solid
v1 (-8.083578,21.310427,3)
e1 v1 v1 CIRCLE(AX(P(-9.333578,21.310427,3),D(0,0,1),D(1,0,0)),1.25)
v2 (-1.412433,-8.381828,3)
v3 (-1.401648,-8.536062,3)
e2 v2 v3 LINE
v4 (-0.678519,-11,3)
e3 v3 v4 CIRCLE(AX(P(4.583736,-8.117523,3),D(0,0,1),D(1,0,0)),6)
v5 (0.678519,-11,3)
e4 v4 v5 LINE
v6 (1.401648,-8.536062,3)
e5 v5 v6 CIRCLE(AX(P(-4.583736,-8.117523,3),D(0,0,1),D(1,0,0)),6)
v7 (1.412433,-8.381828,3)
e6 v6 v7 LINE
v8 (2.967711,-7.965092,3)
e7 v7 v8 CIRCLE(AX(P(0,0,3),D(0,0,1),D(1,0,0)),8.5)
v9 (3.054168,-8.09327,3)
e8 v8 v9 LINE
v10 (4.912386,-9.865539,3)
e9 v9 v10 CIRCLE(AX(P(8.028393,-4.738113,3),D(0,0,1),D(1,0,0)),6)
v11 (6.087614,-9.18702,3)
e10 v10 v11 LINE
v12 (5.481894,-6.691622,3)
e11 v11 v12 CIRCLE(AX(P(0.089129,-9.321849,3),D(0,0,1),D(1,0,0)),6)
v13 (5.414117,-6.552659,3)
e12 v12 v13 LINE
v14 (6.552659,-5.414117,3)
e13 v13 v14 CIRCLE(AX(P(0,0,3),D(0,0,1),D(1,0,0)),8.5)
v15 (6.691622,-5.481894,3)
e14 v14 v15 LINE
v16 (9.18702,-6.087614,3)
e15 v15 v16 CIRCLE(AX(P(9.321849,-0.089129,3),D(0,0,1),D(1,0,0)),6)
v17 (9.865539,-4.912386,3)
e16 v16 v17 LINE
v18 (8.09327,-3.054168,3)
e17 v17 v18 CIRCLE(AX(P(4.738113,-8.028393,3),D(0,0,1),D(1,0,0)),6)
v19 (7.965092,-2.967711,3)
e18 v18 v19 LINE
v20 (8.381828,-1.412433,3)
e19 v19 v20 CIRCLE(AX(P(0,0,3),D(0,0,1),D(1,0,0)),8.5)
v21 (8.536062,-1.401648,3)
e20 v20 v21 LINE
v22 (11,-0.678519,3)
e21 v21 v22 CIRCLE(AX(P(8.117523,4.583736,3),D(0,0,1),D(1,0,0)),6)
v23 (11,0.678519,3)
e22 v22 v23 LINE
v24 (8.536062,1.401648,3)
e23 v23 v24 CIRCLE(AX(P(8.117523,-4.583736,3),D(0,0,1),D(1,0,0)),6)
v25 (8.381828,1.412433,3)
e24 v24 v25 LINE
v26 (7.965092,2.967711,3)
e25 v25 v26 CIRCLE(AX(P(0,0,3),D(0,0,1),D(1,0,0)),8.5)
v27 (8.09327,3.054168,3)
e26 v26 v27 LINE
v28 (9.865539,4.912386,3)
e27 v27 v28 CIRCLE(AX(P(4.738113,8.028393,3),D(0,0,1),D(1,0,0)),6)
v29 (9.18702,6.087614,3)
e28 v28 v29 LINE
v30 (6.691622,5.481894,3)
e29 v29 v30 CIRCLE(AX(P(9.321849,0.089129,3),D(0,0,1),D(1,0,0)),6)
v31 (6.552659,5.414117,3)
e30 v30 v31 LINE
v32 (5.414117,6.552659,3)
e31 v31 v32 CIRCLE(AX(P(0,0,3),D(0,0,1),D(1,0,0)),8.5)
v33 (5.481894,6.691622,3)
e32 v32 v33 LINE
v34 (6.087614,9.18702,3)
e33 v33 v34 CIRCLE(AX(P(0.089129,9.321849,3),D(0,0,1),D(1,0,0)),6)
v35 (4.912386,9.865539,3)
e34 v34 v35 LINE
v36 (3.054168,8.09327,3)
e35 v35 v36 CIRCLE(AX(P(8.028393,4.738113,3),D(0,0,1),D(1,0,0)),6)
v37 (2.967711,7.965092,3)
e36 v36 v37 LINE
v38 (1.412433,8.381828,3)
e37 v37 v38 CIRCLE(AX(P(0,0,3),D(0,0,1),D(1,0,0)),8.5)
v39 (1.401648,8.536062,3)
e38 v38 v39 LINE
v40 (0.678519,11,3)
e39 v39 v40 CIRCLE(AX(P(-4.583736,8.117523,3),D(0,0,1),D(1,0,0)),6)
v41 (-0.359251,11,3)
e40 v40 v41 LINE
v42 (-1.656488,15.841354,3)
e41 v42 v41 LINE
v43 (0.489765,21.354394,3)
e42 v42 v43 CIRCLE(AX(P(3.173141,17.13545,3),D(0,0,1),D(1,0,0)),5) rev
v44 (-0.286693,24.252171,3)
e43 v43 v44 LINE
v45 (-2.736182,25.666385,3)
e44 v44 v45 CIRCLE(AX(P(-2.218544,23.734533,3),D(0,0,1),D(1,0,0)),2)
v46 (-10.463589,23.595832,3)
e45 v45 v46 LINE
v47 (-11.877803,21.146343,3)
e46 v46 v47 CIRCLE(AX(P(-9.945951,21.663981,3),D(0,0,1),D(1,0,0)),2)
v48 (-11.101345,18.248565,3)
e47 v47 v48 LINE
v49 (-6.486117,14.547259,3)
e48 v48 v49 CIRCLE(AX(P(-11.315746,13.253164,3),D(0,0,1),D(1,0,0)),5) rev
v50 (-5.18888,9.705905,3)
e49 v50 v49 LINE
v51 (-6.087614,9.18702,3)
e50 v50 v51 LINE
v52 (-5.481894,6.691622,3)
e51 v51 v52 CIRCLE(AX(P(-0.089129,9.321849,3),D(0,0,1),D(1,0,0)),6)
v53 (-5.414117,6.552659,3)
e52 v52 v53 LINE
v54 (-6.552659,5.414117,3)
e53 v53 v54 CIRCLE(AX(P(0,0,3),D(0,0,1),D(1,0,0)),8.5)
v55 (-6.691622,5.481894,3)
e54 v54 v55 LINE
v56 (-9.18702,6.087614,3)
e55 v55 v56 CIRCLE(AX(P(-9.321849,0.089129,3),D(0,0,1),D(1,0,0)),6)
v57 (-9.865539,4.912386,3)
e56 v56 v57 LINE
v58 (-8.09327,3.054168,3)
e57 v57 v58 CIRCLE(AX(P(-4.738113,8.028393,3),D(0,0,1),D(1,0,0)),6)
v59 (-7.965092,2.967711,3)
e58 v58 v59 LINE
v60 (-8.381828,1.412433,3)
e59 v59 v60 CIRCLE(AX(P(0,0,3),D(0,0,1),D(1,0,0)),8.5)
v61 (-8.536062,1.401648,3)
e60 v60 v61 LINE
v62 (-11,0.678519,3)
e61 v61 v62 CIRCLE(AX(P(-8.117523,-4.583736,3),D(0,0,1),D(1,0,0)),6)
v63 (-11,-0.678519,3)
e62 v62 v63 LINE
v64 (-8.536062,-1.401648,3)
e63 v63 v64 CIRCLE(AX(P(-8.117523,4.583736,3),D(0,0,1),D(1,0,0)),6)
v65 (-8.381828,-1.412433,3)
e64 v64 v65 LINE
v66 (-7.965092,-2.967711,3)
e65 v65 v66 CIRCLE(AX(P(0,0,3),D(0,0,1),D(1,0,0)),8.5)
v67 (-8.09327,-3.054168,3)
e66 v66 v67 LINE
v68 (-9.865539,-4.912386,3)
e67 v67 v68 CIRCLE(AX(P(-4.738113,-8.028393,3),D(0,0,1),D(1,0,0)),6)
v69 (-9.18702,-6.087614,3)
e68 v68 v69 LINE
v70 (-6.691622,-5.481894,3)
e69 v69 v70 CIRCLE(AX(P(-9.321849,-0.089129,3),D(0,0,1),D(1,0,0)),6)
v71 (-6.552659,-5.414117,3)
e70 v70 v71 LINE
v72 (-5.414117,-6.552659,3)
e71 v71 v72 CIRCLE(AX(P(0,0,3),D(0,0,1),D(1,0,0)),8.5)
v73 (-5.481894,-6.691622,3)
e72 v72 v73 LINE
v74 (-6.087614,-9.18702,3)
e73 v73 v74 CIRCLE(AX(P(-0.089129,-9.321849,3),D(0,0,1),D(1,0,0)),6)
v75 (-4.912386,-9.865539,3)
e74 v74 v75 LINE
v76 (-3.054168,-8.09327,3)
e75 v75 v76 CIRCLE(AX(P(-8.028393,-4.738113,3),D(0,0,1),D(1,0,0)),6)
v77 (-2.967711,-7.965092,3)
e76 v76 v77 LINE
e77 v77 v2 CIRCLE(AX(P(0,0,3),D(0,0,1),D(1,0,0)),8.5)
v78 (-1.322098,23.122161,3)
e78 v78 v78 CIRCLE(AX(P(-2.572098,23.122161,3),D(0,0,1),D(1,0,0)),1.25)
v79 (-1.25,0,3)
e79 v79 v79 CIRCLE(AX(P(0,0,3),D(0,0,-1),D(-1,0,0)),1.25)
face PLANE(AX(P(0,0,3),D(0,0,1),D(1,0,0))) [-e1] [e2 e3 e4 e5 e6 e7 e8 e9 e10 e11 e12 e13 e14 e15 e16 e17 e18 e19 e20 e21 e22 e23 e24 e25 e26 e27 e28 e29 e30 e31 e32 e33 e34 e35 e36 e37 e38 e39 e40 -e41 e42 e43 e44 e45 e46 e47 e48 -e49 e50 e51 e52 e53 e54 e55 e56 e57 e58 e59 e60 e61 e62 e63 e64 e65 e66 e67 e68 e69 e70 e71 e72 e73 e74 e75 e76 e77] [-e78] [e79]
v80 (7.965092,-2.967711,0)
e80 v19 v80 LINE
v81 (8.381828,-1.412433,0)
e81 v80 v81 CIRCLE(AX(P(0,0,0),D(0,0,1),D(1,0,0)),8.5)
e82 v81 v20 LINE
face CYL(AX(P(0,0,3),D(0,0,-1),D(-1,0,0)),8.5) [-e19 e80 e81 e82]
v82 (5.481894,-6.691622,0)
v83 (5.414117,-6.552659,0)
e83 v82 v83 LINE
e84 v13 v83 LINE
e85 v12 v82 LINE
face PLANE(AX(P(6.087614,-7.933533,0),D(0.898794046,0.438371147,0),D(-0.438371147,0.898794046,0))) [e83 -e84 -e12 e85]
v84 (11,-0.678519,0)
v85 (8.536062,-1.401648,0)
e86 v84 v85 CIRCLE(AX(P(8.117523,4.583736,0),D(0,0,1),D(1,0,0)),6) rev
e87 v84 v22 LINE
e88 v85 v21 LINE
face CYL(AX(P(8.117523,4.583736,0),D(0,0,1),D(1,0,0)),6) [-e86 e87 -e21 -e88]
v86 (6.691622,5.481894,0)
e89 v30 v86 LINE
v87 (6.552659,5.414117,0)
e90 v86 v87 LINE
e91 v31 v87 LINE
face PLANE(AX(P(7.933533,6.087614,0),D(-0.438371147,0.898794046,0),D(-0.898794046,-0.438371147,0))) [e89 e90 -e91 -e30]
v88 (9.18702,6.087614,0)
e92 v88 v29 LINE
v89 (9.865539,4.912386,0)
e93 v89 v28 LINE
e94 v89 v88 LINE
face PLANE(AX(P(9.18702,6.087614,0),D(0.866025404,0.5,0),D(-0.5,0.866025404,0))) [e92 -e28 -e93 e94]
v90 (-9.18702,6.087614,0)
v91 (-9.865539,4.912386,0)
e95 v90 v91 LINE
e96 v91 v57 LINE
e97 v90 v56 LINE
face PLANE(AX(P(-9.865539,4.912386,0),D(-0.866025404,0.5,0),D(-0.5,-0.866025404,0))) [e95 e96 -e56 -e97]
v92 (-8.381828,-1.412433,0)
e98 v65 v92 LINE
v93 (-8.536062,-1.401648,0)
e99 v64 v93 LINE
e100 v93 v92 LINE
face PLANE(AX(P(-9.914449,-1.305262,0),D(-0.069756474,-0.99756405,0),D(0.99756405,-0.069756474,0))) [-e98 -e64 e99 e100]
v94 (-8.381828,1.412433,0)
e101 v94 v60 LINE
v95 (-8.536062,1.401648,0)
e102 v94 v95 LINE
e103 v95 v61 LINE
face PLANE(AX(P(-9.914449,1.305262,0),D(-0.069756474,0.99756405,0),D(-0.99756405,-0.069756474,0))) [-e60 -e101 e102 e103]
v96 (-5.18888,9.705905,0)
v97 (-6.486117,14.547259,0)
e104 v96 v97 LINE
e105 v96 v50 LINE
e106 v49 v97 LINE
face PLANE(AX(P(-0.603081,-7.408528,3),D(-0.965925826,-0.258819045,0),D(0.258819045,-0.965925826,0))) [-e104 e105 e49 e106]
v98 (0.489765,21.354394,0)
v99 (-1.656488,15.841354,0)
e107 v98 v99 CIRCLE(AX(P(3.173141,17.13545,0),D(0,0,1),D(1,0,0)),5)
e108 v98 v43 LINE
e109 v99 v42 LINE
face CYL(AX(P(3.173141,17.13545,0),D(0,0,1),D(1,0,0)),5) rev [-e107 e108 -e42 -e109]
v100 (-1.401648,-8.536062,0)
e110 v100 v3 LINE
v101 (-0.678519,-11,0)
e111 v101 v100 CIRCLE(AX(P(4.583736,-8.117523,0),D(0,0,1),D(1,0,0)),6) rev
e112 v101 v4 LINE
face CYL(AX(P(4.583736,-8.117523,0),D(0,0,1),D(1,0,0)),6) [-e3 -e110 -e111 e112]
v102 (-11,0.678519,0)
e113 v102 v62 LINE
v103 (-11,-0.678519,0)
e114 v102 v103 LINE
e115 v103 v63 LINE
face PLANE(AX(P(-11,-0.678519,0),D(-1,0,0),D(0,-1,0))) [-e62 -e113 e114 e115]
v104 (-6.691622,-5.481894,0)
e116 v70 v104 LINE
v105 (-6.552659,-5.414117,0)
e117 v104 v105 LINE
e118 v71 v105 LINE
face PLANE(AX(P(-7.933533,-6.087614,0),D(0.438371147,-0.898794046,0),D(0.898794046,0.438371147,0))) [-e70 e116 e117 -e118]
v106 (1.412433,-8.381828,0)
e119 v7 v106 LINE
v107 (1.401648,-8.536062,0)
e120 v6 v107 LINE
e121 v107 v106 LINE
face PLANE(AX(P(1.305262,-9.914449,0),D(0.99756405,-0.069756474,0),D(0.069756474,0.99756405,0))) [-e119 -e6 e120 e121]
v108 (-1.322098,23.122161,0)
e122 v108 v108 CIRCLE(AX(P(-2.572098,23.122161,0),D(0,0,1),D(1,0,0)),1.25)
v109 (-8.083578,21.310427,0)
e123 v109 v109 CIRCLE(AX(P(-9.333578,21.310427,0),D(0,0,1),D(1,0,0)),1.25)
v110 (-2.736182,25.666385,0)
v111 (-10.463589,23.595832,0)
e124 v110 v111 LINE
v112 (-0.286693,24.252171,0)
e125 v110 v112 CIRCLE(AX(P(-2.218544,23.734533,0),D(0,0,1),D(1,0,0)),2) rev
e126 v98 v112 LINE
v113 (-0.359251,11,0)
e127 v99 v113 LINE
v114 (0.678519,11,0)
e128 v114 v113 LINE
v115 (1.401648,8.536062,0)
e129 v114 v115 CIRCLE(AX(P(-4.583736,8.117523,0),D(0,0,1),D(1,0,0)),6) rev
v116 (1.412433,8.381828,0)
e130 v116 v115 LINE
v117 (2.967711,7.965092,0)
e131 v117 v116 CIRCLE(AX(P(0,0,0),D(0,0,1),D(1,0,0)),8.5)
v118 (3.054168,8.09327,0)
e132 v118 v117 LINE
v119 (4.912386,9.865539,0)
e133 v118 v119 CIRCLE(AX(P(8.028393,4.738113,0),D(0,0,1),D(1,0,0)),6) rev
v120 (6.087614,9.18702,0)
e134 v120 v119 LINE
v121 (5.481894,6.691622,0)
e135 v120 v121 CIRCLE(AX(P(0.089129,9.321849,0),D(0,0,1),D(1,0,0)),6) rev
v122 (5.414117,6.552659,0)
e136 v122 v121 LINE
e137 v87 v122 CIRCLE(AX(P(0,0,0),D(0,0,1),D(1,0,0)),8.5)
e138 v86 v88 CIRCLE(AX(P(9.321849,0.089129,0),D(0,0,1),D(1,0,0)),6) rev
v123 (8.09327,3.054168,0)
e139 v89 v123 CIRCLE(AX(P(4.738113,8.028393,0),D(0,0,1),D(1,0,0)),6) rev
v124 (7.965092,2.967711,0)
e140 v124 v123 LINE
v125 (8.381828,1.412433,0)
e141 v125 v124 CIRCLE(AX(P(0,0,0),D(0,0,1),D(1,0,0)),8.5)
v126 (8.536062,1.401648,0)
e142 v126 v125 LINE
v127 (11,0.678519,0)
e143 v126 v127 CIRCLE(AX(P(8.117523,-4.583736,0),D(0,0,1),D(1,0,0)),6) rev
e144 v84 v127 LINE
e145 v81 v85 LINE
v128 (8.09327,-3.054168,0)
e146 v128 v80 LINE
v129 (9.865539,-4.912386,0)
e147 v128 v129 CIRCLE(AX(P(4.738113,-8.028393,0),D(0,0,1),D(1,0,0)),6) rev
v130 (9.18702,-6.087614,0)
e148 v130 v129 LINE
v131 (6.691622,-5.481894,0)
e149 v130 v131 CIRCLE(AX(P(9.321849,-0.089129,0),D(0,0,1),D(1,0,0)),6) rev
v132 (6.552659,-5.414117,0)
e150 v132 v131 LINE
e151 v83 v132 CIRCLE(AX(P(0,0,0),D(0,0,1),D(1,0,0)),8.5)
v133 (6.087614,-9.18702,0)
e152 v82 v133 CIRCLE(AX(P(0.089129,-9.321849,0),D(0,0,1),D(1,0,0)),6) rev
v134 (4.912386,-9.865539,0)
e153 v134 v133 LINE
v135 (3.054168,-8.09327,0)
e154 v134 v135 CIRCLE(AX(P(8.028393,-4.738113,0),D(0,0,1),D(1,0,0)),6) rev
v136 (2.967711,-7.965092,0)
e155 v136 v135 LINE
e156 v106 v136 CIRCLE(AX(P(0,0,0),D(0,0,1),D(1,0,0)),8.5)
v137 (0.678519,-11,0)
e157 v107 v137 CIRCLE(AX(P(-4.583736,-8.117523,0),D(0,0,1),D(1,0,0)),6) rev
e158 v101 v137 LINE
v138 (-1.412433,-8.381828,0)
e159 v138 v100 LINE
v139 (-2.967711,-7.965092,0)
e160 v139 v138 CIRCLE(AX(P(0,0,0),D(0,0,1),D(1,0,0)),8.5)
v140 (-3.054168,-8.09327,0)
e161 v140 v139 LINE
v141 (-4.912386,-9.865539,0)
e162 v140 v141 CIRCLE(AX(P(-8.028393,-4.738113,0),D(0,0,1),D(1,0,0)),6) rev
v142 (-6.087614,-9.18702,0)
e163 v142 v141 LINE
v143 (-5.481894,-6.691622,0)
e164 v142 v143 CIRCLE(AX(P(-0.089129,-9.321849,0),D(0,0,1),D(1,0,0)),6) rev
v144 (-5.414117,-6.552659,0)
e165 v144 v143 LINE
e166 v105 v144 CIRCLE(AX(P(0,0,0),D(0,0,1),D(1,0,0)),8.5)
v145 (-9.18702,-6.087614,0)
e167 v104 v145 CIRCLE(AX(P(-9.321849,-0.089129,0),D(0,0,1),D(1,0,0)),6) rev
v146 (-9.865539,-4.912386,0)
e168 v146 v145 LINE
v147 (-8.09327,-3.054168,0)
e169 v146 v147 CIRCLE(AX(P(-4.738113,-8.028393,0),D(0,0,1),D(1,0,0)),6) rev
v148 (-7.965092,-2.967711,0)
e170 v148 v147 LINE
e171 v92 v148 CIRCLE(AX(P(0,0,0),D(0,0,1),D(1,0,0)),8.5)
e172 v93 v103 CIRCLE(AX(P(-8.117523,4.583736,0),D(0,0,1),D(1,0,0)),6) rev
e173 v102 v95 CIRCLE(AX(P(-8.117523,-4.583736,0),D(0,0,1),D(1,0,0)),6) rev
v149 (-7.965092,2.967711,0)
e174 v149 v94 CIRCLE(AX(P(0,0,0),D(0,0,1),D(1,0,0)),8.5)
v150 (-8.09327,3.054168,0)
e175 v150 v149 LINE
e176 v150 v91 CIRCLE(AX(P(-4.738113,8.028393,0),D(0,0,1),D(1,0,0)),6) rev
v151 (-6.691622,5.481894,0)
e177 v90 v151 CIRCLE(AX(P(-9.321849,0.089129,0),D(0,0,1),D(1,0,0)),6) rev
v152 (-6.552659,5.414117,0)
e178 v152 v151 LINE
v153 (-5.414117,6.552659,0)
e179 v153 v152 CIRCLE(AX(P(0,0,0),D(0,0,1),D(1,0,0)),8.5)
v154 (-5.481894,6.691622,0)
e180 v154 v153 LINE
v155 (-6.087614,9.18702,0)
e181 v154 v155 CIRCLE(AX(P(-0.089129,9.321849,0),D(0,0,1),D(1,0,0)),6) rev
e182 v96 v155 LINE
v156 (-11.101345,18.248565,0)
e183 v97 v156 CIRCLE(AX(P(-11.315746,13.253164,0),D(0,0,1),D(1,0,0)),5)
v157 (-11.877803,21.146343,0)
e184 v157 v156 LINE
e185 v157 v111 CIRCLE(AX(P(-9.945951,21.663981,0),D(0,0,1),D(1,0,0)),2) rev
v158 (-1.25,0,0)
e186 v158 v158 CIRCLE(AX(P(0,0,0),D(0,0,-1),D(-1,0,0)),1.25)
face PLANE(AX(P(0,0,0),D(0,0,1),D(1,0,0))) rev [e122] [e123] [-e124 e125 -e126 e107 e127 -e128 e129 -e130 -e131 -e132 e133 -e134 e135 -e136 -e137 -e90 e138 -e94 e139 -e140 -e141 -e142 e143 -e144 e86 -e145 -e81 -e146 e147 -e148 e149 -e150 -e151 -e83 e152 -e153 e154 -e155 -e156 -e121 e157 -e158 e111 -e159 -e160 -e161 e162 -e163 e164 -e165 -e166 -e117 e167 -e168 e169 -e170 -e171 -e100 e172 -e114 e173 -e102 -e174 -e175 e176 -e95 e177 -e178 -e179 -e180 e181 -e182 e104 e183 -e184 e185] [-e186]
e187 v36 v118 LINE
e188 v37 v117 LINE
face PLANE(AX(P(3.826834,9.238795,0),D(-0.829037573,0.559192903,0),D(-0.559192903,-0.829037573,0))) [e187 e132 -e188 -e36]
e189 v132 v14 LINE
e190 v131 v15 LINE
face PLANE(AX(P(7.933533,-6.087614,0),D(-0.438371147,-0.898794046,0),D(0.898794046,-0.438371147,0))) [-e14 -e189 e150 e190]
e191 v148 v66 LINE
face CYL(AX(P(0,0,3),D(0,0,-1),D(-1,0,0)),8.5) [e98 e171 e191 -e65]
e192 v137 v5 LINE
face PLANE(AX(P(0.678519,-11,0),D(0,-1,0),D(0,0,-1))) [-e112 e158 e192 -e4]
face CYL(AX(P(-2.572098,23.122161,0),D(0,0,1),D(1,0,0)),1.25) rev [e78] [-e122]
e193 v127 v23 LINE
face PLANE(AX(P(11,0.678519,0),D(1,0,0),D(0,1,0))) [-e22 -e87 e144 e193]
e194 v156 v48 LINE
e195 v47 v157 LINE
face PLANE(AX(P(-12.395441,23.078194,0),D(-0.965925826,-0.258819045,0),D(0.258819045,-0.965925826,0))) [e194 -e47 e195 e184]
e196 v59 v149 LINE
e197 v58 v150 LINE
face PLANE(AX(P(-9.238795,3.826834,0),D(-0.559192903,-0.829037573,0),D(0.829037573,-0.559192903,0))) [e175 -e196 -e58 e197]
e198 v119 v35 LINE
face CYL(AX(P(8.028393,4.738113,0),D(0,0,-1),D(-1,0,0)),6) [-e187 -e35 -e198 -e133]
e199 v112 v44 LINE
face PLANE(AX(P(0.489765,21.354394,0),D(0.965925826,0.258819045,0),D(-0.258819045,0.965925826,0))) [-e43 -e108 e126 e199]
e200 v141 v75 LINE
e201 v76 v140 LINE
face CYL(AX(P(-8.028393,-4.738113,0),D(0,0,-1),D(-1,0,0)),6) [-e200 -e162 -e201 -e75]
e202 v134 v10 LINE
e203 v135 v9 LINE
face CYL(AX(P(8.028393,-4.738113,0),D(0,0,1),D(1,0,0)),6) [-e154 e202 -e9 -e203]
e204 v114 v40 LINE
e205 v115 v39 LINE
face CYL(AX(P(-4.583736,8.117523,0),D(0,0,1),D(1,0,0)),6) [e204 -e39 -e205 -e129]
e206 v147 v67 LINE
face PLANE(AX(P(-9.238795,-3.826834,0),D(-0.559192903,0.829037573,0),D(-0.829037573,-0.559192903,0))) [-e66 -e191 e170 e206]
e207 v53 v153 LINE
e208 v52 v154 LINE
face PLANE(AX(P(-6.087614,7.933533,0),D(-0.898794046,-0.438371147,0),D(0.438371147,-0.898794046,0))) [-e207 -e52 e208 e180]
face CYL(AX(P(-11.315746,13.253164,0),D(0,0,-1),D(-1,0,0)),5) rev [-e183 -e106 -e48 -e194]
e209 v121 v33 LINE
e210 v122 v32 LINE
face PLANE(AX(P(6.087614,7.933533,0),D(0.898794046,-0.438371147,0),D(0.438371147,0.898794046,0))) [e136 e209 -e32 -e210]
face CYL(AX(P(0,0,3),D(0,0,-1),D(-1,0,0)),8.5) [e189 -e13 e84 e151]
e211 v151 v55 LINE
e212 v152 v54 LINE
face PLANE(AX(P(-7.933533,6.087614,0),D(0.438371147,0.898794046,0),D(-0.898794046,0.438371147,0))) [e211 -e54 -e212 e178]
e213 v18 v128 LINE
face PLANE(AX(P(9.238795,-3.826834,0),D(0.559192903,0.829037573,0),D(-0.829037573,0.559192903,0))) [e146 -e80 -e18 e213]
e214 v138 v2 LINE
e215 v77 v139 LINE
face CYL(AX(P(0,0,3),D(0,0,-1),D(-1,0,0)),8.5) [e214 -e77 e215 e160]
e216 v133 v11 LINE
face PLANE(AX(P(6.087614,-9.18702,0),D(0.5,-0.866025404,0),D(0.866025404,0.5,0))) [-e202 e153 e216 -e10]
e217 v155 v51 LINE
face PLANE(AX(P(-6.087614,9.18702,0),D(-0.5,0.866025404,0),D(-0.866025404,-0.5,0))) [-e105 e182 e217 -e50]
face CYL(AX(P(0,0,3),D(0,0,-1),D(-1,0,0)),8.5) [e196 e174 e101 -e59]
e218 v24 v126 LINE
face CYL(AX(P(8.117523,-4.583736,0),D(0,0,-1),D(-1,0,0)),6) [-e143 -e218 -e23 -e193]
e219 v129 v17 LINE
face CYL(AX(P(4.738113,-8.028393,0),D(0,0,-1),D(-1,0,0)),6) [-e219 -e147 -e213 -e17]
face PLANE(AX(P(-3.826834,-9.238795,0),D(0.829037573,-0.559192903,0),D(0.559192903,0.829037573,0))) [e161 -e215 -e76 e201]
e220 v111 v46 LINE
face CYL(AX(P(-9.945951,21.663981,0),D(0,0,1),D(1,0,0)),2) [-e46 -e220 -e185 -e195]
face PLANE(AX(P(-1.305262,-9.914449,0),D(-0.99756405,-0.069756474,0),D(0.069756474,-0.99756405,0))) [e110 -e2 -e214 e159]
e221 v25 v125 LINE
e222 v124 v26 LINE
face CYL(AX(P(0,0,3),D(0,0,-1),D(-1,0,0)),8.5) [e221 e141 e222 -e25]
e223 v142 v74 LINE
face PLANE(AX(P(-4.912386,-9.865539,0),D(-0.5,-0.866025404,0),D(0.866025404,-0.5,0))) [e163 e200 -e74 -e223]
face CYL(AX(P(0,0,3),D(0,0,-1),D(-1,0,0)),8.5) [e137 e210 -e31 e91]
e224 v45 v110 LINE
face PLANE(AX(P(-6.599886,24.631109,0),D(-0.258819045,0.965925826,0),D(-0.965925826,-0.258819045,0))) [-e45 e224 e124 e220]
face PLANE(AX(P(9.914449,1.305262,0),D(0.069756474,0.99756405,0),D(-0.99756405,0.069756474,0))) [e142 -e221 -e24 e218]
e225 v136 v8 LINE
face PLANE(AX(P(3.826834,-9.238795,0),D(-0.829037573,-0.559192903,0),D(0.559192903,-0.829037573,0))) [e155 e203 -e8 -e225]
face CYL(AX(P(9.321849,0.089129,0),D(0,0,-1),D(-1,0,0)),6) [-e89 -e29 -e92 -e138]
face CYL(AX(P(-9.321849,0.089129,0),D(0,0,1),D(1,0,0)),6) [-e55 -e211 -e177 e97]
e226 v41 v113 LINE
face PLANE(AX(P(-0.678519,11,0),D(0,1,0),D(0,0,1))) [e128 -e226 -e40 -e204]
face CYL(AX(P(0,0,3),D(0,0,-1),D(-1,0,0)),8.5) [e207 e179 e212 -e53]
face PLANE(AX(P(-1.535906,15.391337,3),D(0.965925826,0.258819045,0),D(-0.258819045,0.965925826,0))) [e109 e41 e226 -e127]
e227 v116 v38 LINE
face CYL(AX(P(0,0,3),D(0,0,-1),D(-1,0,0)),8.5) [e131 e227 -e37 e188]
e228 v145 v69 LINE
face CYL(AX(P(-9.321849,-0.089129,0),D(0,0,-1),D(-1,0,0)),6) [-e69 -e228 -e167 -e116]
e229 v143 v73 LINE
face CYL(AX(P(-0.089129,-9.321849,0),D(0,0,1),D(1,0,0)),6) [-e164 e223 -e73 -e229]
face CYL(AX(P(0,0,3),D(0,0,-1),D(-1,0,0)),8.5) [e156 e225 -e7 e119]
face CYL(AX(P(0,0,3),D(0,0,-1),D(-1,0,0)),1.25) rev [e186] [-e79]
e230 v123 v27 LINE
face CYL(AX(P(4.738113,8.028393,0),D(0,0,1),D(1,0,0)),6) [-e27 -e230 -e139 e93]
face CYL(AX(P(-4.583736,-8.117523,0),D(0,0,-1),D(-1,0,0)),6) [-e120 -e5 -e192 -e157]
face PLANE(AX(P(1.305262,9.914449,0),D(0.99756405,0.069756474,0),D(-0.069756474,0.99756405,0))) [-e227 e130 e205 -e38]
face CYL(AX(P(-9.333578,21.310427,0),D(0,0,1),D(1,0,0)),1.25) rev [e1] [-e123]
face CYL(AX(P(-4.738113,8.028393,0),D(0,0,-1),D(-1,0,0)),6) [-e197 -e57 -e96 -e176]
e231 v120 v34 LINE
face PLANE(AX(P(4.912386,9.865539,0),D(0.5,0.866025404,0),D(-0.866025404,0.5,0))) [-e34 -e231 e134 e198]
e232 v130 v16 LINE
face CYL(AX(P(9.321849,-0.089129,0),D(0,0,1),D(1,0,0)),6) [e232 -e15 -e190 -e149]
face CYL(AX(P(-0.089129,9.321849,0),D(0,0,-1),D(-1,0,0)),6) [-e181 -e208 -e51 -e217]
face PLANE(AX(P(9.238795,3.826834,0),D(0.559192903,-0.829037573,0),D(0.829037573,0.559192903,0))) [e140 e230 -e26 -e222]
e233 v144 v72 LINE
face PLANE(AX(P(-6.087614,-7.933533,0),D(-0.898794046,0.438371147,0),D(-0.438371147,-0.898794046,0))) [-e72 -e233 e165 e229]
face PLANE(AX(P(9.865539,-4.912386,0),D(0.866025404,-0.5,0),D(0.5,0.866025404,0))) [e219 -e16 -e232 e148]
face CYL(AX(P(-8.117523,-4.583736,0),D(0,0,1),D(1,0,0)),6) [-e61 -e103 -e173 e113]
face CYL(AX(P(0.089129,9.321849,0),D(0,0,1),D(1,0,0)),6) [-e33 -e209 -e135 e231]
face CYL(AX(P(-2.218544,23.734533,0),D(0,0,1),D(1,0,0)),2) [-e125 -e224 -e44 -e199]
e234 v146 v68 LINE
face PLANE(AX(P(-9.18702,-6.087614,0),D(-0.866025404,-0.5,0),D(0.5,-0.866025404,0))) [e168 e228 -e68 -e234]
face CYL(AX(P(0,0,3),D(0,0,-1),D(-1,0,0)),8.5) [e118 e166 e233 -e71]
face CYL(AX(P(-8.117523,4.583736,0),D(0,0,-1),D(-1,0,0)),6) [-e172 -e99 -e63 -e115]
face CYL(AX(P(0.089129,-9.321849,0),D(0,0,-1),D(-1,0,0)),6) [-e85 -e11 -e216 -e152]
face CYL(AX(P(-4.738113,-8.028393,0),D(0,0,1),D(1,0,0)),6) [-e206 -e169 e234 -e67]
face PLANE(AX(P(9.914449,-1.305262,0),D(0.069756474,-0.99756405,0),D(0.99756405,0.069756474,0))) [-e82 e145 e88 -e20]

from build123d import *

# Parameters (mm, degrees)
SKETCH1_R           = 8.5
BOSS_EXTRUDE1_DEPTH = 3
BOSS_EXTRUDE2_DEPTH = 3
CIRPATTERN2_COUNT   = 12
FILLET5_R           = 6
FILLET6_R           = 6
BOSS_EXTRUDE5_DEPTH = 3
SKETCH15_R          = 5
BOSS_EXTRUDE6_DEPTH = 1.9
SKETCH14_R          = 1.25
CUT_EXTRUDE7_DEPTH  = 28.730582035
SKETCH17_R          = 1.25
CUT_EXTRUDE9_DEPTH  = 28.730582035
FILLET7_R           = 2.5
BOSS_EXTRUDE7_DEPTH = 3
SKETCH20_R          = 1.25
CUT_EXTRUDE10_DEPTH = 3
FILLET8_R           = 5
FILLET9_R           = 5
FILLET10_R          = 2
FILLET11_R          = 2


# Some blends are built 0.0001 mm under size
with BuildPart() as part:
    # Sketch1 → Boss-Extrude1 (new body)
    with BuildSketch(Plane.XY):
        Circle(SKETCH1_R)
    extrude(amount=BOSS_EXTRUDE1_DEPTH)

    # Sketch3 → Boss-Extrude2 (add)
    with BuildSketch(Plane.XY.offset(3)):
        Polygon((-1.305261922, 9.914448614), (-1.509060022, 7), (1.509060022, 7), (1.305261922, 9.914448614), (0.678518537, 11), (-0.678518537, 11), align=None)
    boss_extrude2 = extrude(amount=-BOSS_EXTRUDE2_DEPTH)

    # CirPattern2: Boss-Extrude2 ×12 about axis
    cirpattern2_axis = Axis((0, 0, 0), (0, 0, 1))
    for i in range(1, CIRPATTERN2_COUNT):
        add(boss_extrude2.rotate(cirpattern2_axis, i * 360 / CIRPATTERN2_COUNT))

    # Fillet5
    # the kernel refuses this fillet: 6 mm, written as the material it takes off along each edge
    with BuildSketch(Plane(origin=(9.238795325, 3.826834324, 6.454382408), x_dir=(0.4999999999998129, 0.8660254037845467, 0), z_dir=(0, 0, -1)), Plane(origin=(1.305261922, 9.914448614, 6.454382408), x_dir=(-0.5000000000001841, 0.8660254037843323, 0), z_dir=(0, 0, -1)), Plane(origin=(-7.933533403, 6.08761429, 6.454382408), x_dir=(-1, 0, 0), z_dir=(0, 0, -1)), Plane(origin=(-9.914448614, 1.305261922, 6.454382408), x_dir=(-0.8660254037843317, -0.5000000000001852, 0), z_dir=(0, 0, -1)), Plane(origin=(-9.238795325, -3.826834324, 6.454382408), x_dir=(-0.49999999999981826, -0.8660254037845436, 0), z_dir=(0, 0, -1)), Plane(origin=(-6.08761429, -7.933533403, 6.454382408), x_dir=(0, -1, 0), z_dir=(0, 0, -1)), Plane(origin=(3.826834324, -9.238795325, 6.454382408), x_dir=(0.866025403784545, -0.49999999999981576, 0), z_dir=(0, 0, -1)), Plane(origin=(7.933533403, -6.08761429, 6.454382408), x_dir=(1, 0, 0), z_dir=(0, 0, -1)), Plane(origin=(9.914448614, -1.305261922, 6.454382408), x_dir=(0.8660254037843321, 0.5000000000001844, 0), z_dir=(0, 0, -1))) as fillet5_piece_1:
        with BuildLine():
            CenterArc((1.388315544, -5.998484909), FILLET5_R, 91.287628333, 24.712371667)
            Line((-1.241911337, -0.605720631), (-1.294515874, -0.497865346))
            Line((-1.294515874, -0.497865346), (-0.052604538, 0.107855286))
            Line((-0.052604538, 0.107855286), (0, 0.12))
            ThreePointArc((0, 0.12), (0.626743385, 0.12), (1.250790195, 0.119969698))
            Line((1.250790195, 0.119969698), (1.25348677, 0))
        make_face()
    extrude(amount=9.908764816, mode=Mode.SUBTRACT)
    with BuildSketch(Plane(origin=(6.08761429, 7.933533403, 6.454382408), x_dir=(-0.4383711467890806, -0.8987940462991654, 0), z_dir=(0, 0, -1)), Plane(origin=(-3.826834324, 9.238795325, 6.454382408), x_dir=(0.5591929034707435, -0.8290375725550441, 0), z_dir=(0, 0, -1)), Plane(origin=(-1.305261922, -9.914448614, 6.454382408), x_dir=(-0.06975647374412178, 0.9975640502598244, 0), z_dir=(0, 0, -1))) as fillet5_piece_2:
        with BuildLine():
            CenterArc((1.381752963, 6), FILLET5_R, 245.287628333, 24.712371667)
            Line((-1.126626446, 0.549492433), (-1.176794034, 0.440482282))
            ThreePointArc((-1.176794034, 0.440482282), (-0.615917761, 0.166890931), (-0.052604538, -0.107855286))
            Line((-0.052604538, -0.107855286), (0, -0.12))
            Line((0, -0.12), (1.381752963, -0.12))
            Line((1.381752963, -0.12), (1.381752963, 0))
        make_face()
    extrude(amount=9.908764816, mode=Mode.SUBTRACT)

    # Fillet6
    # the kernel refuses this fillet: 6 mm, written as the material it takes off along each edge
    with BuildSketch(Plane(origin=(7.933533403, 6.08761429, 6.454382408), x_dir=(-0.8987940462991681, -0.4383711467890748, 0), z_dir=(0, 0, -1)), Plane(origin=(3.826834324, 9.238795325, 6.454382408), x_dir=(-0.5591929034707512, -0.8290375725550386, 0), z_dir=(0, 0, -1)), Plane(origin=(-1.305261922, 9.914448614, 6.454382408), x_dir=(-0.06975647374412959, -0.9975640502598239, 0), z_dir=(0, 0, -1)), Plane(origin=(-6.08761429, 7.933533403, 6.454382408), x_dir=(0.43837114678907496, -0.8987940462991681, 0), z_dir=(0, 0, -1)), Plane(origin=(-9.238795325, 3.826834324, 6.454382408), x_dir=(0.8290375725550394, -0.5591929034707502, 0), z_dir=(0, 0, -1)), Plane(origin=(-9.914448614, -1.305261922, 6.454382408), x_dir=(0.9975640502598241, -0.06975647374412908, 0), z_dir=(0, 0, -1)), Plane(origin=(-7.933533403, -6.08761429, 6.454382408), x_dir=(0.8987940462991686, 0.4383711467890744, 0), z_dir=(0, 0, -1)), Plane(origin=(-3.826834324, -9.238795325, 6.454382408), x_dir=(0.559192903470749, 0.8290375725550401, 0), z_dir=(0, 0, -1)), Plane(origin=(1.305261922, -9.914448614, 6.454382408), x_dir=(0.06975647374412973, 0.9975640502598241, 0), z_dir=(0, 0, -1)), Plane(origin=(6.08761429, -7.933533403, 6.454382408), x_dir=(-0.4383711467890742, 0.8987940462991686, 0), z_dir=(0, 0, -1)), Plane(origin=(9.238795325, -3.826834324, 6.454382408), x_dir=(-0.8290375725550386, 0.5591929034707512, 0), z_dir=(0, 0, -1)), Plane(origin=(9.914448614, 1.305261922, 6.454382408), x_dir=(-0.9975640502598239, 0.06975647374412945, 0), z_dir=(0, 0, -1))) as fillet6_piece_1:
        with BuildLine():
            CenterArc((1.381752963, -6), FILLET6_R, 90, 24.712371667)
            Line((-1.126626446, -0.549492433), (-1.176794034, -0.440482282))
            ThreePointArc((-1.176794034, -0.440482282), (-0.615917761, -0.166890931), (-0.052604538, 0.107855286))
            Line((-0.052604538, 0.107855286), (0, 0.12))
            Line((0, 0.12), (1.381752963, 0.12))
            Line((1.381752963, 0.12), (1.381752963, 0))
        make_face()
    extrude(amount=9.908764816, mode=Mode.SUBTRACT)

    # Sketch12 → Boss-Extrude5 (add)
    with BuildSketch(Plane(origin=(0, 0, 0), x_dir=(-1, 0, 0), z_dir=(0, 0, -1))):
        Polygon((1.535905814, 15.391336798), (-4.226547881, -6.114433171), (0.60308125, -7.408528397), (9.014700216, 23.984060958), (4.185071084, 25.278156183), align=None)
    extrude(amount=-BOSS_EXTRUDE5_DEPTH)

    # Sketch15 → Boss-Extrude6 (add)
    with BuildSketch(Plane(origin=(0, 0, 0), x_dir=(-1, 0, 0), z_dir=(0, 0, -1))):
        Circle(SKETCH15_R)
    extrude(amount=-BOSS_EXTRUDE6_DEPTH)

    # Sketch14 → Cut-Extrude7 (cut, through all)
    with BuildSketch(Plane(origin=(0, 0, 0), x_dir=(-1, 0, 0), z_dir=(0, 0, -1))):
        Circle(SKETCH14_R)
    extrude(amount=-CUT_EXTRUDE7_DEPTH, mode=Mode.SUBTRACT)

    # Sketch17 → Cut-Extrude9 (cut, through all)
    with BuildSketch(Plane.XY.offset(3)):
        with Locations((-5.952838037, 22.216294005)):
            Circle(SKETCH17_R)
    extrude(amount=-CUT_EXTRUDE9_DEPTH, mode=Mode.SUBTRACT)

    # Fillet7
    fillet7_edges = [part.edges().sort_by_distance(p)[0] for p in [
        (-9.014700216, 23.984060958, 1.5),
        (-4.185071084, 25.278156183, 1.5),
    ]]
    fillet(fillet7_edges, radius=FILLET7_R - 0.0001)  # a hair under: the kernel refuses the full size

    # Sketch19 → Boss-Extrude7 (add)
    with BuildSketch(Plane.XY.offset(3)):
        Polygon((-6.59988565, 24.63110857), (-12.395440608, 23.0781943), (-11.101345382, 18.248565168), (0.489764533, 21.35439371), (-0.804330692, 26.184022841), align=None)
    extrude(amount=-BOSS_EXTRUDE7_DEPTH)

    # Sketch20 → Cut-Extrude10 (cut)
    with BuildSketch(Plane.XY.offset(3)):
        with Locations((-9.333578429, 21.310427347)):
            Circle(SKETCH20_R)
        with Locations((-2.572097645, 23.122160663)):
            Circle(SKETCH20_R)
    extrude(amount=-CUT_EXTRUDE10_DEPTH, mode=Mode.SUBTRACT)

    # Fillet8
    # the kernel refuses this fillet: 5 mm, written as the material it adds along each edge
    with BuildSketch(Plane(origin=(-7.72060499, 19.154431826, 0), x_dir=(-0.9659258262890523, -0.25881904510258064, 0), z_dir=(0, 0, 1))) as fillet8_piece_1:
        with BuildLine():
            CenterArc((5, 4.769696007), FILLET8_R, 180, 72.542396876)
            Line((0, 4.769696007), (-0.1, 4.769696007))
            Line((-0.1, 4.769696007), (-0.1, 0))
            Line((-0.1, 0), (0, -0.1))
            ThreePointArc((0, -0.1), (1.75, -0.1), (3.47, -0.09539392))
            Line((3.47, -0.09539392), (3.5, 0))
        make_face()
    extrude(amount=3)

    # Fillet9
    # the kernel refuses this fillet: 5 mm, written as the material it adds along each edge
    with BuildSketch(Plane(origin=(-2.890975859, 20.448527052, 3), x_dir=(0.9659258262890524, 0.25881904510257997, 0), z_dir=(0, 0, -1))) as fillet9_piece_1:
        with BuildLine():
            CenterArc((5, 4.769696007), FILLET9_R, 180, 72.542396876)
            Line((0, 4.769696007), (-0.1, 4.769696007))
            Line((-0.1, 4.769696007), (-0.1, 0))
            Line((-0.1, 0), (0, -0.1))
            ThreePointArc((0, -0.1), (1.75, -0.1), (3.47, -0.09539392))
            Line((3.47, -0.09539392), (3.5, 0))
        make_face()
    extrude(amount=3)

    # Fillet10
    fillet10_edges = [part.edges().sort_by_distance(p)[0] for p in [
        (-0.804330692, 26.184022841, 1.5),
    ]]
    fillet(fillet10_edges, radius=FILLET10_R)

    # Fillet11
    fillet11_edges = [part.edges().sort_by_distance(p)[0] for p in [
        (-12.395440608, 23.0781943, 1.5),
    ]]
    fillet(fillet11_edges, radius=FILLET11_R)


solid = part.part
